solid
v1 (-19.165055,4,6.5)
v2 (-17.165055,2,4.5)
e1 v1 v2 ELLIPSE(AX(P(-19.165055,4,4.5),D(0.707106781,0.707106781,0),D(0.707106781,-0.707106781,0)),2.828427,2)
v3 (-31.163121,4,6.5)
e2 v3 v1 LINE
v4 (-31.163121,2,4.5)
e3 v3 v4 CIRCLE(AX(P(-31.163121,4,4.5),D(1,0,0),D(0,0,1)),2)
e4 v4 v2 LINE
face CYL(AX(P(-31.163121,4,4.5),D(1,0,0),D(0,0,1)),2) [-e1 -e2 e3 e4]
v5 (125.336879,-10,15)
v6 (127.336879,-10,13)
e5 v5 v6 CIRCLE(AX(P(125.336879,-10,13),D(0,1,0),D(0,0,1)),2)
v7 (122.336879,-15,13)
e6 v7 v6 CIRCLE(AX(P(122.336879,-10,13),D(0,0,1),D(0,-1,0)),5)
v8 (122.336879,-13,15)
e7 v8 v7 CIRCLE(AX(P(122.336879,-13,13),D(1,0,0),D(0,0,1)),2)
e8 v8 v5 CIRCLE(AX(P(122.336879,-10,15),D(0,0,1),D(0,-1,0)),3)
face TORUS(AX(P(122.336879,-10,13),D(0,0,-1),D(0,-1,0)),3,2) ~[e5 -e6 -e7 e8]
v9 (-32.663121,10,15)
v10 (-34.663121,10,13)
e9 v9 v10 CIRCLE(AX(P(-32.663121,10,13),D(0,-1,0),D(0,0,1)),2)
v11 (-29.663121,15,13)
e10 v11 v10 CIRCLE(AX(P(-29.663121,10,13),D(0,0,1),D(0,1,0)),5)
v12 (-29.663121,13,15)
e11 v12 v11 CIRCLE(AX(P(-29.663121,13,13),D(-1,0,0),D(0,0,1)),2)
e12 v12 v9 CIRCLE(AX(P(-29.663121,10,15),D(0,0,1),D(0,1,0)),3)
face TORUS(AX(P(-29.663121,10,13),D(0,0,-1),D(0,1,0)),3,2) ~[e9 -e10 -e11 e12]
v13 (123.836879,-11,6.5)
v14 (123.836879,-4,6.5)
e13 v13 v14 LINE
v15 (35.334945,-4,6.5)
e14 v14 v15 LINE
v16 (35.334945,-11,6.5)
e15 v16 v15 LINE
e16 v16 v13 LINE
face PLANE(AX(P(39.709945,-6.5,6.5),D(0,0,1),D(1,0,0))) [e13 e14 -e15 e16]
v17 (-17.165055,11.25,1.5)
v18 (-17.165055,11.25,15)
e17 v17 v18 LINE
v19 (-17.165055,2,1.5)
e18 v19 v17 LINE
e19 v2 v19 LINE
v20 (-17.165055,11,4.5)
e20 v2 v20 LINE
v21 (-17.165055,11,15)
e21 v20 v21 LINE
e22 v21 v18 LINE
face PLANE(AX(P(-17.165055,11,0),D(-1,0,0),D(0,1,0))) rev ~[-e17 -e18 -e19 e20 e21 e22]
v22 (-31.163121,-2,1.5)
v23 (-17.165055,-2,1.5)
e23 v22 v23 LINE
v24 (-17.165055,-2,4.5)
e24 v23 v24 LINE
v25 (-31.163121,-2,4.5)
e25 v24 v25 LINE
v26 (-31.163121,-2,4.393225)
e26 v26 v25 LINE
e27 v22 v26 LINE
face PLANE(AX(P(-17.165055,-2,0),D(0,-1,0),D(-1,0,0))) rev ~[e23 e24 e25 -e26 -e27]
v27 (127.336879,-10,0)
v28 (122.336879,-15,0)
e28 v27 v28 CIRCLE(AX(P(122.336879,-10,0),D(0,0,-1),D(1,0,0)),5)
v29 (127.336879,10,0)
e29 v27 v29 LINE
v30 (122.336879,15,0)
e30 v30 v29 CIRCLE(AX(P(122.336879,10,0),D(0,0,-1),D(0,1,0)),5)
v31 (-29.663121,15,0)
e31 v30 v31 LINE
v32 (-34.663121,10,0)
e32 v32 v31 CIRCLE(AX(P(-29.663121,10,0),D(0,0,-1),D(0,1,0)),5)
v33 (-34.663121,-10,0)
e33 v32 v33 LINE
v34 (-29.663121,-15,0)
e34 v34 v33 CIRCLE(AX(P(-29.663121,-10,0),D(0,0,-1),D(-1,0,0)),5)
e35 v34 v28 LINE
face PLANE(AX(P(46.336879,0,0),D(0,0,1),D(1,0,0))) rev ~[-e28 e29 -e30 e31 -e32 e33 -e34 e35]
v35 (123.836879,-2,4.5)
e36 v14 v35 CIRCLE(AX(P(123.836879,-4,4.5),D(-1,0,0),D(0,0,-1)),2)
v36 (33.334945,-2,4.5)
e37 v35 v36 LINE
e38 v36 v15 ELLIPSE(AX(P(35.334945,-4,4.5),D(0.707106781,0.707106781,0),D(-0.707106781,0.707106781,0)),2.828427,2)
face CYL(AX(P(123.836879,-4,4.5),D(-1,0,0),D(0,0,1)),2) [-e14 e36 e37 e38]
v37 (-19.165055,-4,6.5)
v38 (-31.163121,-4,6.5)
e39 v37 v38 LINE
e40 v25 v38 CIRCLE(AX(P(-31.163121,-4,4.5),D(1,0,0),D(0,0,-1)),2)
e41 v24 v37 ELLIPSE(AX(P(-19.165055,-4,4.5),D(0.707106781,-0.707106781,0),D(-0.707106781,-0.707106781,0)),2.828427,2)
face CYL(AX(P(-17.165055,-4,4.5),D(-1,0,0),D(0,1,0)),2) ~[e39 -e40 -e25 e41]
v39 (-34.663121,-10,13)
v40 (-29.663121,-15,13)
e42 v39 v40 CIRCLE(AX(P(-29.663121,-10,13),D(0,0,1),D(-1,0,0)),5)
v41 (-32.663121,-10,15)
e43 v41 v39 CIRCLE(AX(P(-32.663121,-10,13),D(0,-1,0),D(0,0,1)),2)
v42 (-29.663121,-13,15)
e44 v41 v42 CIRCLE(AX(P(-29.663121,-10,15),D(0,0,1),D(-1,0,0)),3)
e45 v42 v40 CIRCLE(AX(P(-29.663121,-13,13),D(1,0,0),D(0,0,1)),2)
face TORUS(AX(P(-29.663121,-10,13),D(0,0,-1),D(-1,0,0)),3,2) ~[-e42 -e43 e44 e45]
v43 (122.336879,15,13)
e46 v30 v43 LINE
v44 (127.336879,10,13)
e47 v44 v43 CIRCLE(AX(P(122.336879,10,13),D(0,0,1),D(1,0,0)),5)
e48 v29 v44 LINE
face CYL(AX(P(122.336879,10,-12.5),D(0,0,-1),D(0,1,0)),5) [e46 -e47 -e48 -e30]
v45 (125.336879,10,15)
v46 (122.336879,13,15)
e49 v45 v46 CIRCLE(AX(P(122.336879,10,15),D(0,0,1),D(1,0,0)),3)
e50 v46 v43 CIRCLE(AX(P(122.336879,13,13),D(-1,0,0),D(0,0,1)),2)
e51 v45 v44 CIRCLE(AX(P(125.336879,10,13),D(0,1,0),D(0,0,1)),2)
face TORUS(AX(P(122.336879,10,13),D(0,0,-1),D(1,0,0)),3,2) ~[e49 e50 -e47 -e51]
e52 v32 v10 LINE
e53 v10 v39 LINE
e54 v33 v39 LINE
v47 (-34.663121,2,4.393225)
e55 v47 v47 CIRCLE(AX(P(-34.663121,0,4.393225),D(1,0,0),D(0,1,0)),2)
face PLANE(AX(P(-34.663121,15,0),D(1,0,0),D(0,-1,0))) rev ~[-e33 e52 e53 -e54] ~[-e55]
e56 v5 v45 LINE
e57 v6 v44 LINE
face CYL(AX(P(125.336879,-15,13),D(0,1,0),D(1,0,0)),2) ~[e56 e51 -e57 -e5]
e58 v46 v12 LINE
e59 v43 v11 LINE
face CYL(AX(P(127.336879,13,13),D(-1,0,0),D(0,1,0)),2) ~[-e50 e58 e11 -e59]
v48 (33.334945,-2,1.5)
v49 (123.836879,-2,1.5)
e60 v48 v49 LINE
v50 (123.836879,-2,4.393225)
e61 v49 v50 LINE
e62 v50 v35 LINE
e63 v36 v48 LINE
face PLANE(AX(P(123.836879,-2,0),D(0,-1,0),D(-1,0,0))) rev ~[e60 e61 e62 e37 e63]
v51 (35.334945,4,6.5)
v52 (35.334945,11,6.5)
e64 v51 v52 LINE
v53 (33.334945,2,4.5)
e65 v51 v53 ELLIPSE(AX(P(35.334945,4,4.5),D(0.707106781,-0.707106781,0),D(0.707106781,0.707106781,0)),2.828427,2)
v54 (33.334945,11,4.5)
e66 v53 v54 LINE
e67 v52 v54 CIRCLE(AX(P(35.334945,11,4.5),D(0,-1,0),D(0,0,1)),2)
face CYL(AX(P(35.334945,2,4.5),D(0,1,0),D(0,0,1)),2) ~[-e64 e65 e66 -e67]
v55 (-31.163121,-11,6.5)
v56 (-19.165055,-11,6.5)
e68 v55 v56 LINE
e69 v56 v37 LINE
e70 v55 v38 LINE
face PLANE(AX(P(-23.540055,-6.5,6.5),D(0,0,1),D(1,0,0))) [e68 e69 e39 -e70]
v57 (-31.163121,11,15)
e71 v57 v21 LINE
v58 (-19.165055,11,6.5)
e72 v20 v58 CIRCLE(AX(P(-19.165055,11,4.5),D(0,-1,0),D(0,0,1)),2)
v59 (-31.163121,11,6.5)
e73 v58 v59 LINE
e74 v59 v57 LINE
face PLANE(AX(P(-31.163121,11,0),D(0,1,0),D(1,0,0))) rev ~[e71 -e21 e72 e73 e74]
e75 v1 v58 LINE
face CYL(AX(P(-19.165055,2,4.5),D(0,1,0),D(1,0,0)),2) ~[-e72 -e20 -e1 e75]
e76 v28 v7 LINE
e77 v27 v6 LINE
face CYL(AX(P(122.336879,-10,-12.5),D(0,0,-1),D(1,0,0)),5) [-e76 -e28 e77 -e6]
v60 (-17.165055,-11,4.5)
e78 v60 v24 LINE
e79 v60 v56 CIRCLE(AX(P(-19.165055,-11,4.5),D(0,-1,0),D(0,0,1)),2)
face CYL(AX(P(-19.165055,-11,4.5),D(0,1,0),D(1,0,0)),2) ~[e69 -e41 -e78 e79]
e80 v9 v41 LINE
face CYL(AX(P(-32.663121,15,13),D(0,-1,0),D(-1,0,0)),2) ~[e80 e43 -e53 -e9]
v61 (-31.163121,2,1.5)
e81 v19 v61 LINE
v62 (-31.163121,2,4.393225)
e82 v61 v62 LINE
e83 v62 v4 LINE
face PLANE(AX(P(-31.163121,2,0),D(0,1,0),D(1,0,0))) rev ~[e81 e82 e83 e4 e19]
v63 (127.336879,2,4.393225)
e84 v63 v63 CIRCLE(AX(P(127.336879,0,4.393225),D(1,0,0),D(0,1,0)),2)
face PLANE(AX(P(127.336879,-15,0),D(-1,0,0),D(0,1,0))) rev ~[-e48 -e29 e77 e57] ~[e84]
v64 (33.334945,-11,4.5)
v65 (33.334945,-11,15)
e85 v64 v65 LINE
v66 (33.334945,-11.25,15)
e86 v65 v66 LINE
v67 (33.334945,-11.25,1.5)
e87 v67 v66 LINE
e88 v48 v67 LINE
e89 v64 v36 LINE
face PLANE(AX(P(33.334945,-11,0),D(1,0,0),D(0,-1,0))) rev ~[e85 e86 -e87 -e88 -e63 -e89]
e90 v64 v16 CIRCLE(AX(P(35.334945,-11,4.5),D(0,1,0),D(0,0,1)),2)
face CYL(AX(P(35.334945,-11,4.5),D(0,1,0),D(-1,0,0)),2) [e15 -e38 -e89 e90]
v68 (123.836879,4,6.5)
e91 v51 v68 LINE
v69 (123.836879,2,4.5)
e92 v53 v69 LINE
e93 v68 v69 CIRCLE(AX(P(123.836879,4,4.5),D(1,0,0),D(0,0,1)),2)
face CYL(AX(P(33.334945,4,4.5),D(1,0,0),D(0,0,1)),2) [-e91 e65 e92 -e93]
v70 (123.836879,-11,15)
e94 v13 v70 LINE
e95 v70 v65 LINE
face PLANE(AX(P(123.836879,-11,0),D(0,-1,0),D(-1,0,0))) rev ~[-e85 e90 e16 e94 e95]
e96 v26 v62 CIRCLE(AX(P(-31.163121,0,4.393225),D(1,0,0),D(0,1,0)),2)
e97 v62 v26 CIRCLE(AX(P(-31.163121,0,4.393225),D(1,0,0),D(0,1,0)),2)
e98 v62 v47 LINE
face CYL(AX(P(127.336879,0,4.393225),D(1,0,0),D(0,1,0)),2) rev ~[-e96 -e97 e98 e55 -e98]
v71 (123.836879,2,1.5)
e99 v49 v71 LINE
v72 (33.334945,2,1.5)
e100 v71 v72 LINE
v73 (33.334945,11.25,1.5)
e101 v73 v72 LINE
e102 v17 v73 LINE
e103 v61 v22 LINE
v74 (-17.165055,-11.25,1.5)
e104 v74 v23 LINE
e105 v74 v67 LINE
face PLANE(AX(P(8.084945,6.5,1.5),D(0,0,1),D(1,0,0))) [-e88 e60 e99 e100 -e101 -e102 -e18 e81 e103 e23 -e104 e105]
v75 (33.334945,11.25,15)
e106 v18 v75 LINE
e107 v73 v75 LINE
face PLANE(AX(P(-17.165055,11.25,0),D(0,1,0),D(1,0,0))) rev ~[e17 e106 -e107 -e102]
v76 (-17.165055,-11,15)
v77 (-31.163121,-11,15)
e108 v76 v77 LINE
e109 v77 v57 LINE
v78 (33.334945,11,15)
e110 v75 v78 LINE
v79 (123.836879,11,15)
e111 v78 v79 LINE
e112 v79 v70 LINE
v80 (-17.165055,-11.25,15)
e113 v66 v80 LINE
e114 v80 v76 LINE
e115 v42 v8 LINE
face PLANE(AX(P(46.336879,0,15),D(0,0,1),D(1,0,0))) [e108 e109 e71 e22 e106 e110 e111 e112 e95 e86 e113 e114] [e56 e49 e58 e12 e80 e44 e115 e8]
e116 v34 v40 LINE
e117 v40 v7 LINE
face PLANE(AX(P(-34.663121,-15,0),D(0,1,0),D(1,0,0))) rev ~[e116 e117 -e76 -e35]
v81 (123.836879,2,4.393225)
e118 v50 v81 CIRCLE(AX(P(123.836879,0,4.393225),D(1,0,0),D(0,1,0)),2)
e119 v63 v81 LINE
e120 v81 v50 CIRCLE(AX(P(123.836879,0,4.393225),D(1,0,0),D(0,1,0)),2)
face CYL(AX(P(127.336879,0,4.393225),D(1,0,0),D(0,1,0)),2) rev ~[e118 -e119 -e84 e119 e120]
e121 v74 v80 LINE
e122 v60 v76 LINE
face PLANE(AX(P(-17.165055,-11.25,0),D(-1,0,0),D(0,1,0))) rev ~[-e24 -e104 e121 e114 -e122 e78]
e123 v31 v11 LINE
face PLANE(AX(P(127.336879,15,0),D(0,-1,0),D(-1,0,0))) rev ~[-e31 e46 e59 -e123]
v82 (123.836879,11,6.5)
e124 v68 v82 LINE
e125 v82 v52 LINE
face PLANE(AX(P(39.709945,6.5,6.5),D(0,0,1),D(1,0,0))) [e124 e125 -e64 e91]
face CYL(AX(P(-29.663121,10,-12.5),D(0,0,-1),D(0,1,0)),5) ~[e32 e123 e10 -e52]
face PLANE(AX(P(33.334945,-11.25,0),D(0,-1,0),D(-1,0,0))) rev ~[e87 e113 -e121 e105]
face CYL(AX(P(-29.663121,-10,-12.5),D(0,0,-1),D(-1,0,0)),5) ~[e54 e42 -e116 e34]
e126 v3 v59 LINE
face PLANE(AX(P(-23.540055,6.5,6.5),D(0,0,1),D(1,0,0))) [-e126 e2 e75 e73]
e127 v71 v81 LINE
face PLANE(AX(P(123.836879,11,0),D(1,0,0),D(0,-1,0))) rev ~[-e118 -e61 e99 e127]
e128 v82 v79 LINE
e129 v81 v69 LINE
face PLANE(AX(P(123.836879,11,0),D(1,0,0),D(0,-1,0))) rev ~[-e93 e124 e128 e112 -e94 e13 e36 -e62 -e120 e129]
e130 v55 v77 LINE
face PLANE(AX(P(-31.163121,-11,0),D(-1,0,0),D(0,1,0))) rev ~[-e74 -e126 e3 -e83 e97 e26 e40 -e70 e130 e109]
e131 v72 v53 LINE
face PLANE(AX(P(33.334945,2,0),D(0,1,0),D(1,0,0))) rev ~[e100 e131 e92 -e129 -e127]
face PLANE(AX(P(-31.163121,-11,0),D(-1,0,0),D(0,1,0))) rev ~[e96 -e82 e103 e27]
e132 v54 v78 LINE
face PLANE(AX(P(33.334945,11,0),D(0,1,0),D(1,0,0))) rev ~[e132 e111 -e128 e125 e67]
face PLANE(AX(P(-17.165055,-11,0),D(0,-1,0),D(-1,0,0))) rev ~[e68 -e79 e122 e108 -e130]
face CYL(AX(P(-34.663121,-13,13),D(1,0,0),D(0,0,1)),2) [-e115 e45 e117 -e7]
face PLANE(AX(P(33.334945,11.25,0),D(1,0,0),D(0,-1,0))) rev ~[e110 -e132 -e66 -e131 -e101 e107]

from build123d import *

# Parameters (mm, degrees)
F0_W         = 50.5
F0_H         = 9
F0_H_2       = 2
F0_W_2       = 12.75
F0_H_3       = 0.25
F0_W_3       = 1.2480659857
F1_DEPTH     = 1.5
F0_W_4       = 77.7519340143
F2_DEPTH     = 6.5
F3_DEPTH     = 15
F4_R         = 2
F5_DEPTH     = 162.001
F6_R         = 2
F7_T1_DEPTH  = 27.5
F7_T4_ANGLE  = 90
F7_T6_ANGLE  = 90
F7_T8_ANGLE  = 90
F7_T10_ANGLE = 90


# Not quite as in the source:
# - a fillet or chamfer that OpenCascade refuses, or shapes differently, is made with other operations: its cross-section is extruded or revolved along the edge and cut away or added


with BuildPart() as f1:
    # F0 (on Top) → F1 (new body)
    with BuildSketch(Plane.XY):
        with Locations((8.0849453807, 6.5)):
            Rectangle(F0_W, F0_H)
        with Locations((8.0849453807, 1)):
            Rectangle(F0_W, F0_H_2)
        with Locations((8.0849453807, -1)):
            Rectangle(F0_W, F0_H_2)
        with Locations((-23.5400546193, -1)):
            Rectangle(F0_W_2, F0_H_2)
        with Locations((-23.5400546193, 1)):
            Rectangle(F0_W_2, F0_H_2)
        with Locations((39.7099453807, 1)):
            Rectangle(F0_W_2, F0_H_2)
        with Locations((39.7099453807, -1)):
            Rectangle(F0_W_2, F0_H_2)
        Polygon((46.0849453807, 2), (46.0849453807, 0), (46.0849453807, -2), (123.8368793949, -2), (123.8368793949, 2), align=None)
        with Locations((8.0849453807, -6.5)):
            Rectangle(F0_W, F0_H)
        with Locations((8.0849453807, 11.125)):
            Rectangle(F0_W, F0_H_3)
        with Locations((8.0849453807, -11.125)):
            Rectangle(F0_W, F0_H_3)
        with Locations((-30.5390876122, -1)):
            Rectangle(F0_W_3, F0_H_2)
        with Locations((-30.5390876122, 1)):
            Rectangle(F0_W_3, F0_H_2)
    extrude(amount=F1_DEPTH)

    # F0 (on Top) → F2 (join)
    with BuildSketch(Plane.XY):
        with Locations((-23.5400546193, 6.5)):
            Rectangle(F0_W_2, F0_H)
        with Locations((-30.5390876122, 6.5)):
            Rectangle(F0_W_3, F0_H)
        with Locations((-23.5400546193, -6.5)):
            Rectangle(F0_W_2, F0_H)
        with Locations((-30.5390876122, -6.5)):
            Rectangle(F0_W_3, F0_H)
        with Locations((39.7099453807, -6.5)):
            Rectangle(F0_W_2, F0_H)
        with Locations((39.7099453807, 6.5)):
            Rectangle(F0_W_2, F0_H)
        with Locations((84.9609123878, 6.5)):
            Rectangle(F0_W_4, F0_H)
        with Locations((84.9609123878, -6.5)):
            Rectangle(F0_W_4, F0_H)
    extrude(amount=F2_DEPTH)

    # F0 (on Top) → F3 (join)
    with BuildSketch(Plane.XY):
        Polygon((127.3368793949, -15), (127.3368793949, 15), (-34.6631206051, 15), (-34.6631206051, 0), (-34.6631206051, -15), align=None)
        Polygon((-31.1631206051, -2), (-31.1631206051, 0), (-31.1631206051, 2), (-31.1631206051, 11), (-29.9150546193, 11), (-17.1650546193, 11), (-17.1650546193, 11.25), (33.3349453807, 11.25), (33.3349453807, 11), (46.0849453807, 11), (123.8368793949, 11), (123.8368793949, 2), (123.8368793949, -2), (123.8368793949, -11), (46.0849453807, -11), (33.3349453807, -11), (33.3349453807, -11.25), (-17.1650546193, -11.25), (-17.1650546193, -11), (-29.9150546193, -11), (-31.1631206051, -11), align=None, mode=Mode.SUBTRACT)
    extrude(amount=F3_DEPTH)

    # F4 (on face) → F5 (cut, through all)
    with BuildSketch(Plane.YZ.offset(127.3368793949)):
        with Locations((0, 4.3932246044)):
            Circle(F4_R)
    extrude(amount=-F5_DEPTH, mode=Mode.SUBTRACT)

    # F6
    f6_edges = [f1.edges().sort_by_distance(p)[0] for p in [
        (-24.164088, -2, 6.5),
        (-24.164088, 2, 6.5),
        (-17.165055, -6.5, 6.5),
        (-17.165055, 6.5, 6.5),
        (33.334945, 6.5, 6.5),
        (33.334945, -6.5, 6.5),
        (78.585912, -2, 6.5),
        (78.585912, 2, 6.5),
        (46.336879, 15, 15),
        (-34.663121, 0, 15),
        (46.336879, -15, 15),
        (127.336879, 0, 15),
    ]]
    fillet(f6_edges, radius=F6_R)

    # F7: fillet of radius 5 on 4 edges, made by hand

    # F7_s2 → F7_t1 (cut)
    with BuildSketch(Plane.XY.offset(-12.5)):
        with BuildLine():
            ThreePointArc((-29.6631206051, 15), (-33.198654511, 13.5355339059), (-34.6631206051, 10))
            Line((-34.6631206051, 10), (-34.6631206051, 15))
            Line((-34.6631206051, 15), (-29.6631206051, 15))
        make_face()
        with BuildLine():
            ThreePointArc((-34.6631206051, -10), (-33.198654511, -13.5355339059), (-29.6631206051, -15))
            Line((-29.6631206051, -15), (-34.6631206051, -15))
            Line((-34.6631206051, -15), (-34.6631206051, -10))
        make_face()
        with BuildLine():
            ThreePointArc((122.3368793949, 15), (125.8724133009, 13.5355339059), (127.3368793949, 10))
            Line((127.3368793949, 10), (127.3368793949, 15))
            Line((127.3368793949, 15), (122.3368793949, 15))
        make_face()
        with BuildLine():
            ThreePointArc((127.3368793949, -10), (125.8724133009, -13.5355339059), (122.3368793949, -15))
            Line((122.3368793949, -15), (127.3368793949, -15))
            Line((127.3368793949, -15), (127.3368793949, -10))
        make_face()
    extrude(amount=F7_T1_DEPTH, mode=Mode.SUBTRACT)

    # F7_s3 → F7_t4 (revolve, cut)
    with BuildSketch(Plane.YZ.offset(122.3368793949)):
        with BuildLine():
            ThreePointArc((-13, 15), (-14.4142135624, 14.4142135624), (-15, 13))
            Line((-15, 13), (-15, 15))
            Line((-15, 15), (-13, 15))
        make_face()
    revolve(axis=Axis((122.3368793949, -10, 15), (0, 0, 1)), revolution_arc=F7_T4_ANGLE, mode=Mode.SUBTRACT)

    # F7_s5 → F7_t6 (revolve, cut)
    with BuildSketch(Plane.XZ.offset(-10)):
        with BuildLine():
            ThreePointArc((125.3368793949, 15), (126.7510929573, 14.4142135624), (127.3368793949, 13))
            Line((127.3368793949, 13), (127.3368793949, 15))
            Line((127.3368793949, 15), (125.3368793949, 15))
        make_face()
    revolve(axis=Axis((122.3368793949, 10, 15), (0, 0, 1)), revolution_arc=F7_T6_ANGLE, mode=Mode.SUBTRACT)

    # F7_s7 → F7_t8 (revolve, cut)
    with BuildSketch(Plane.XZ.offset(10)):
        with BuildLine():
            ThreePointArc((-32.6631206051, 15), (-34.0773341674, 14.4142135624), (-34.6631206051, 13))
            Line((-34.6631206051, 13), (-34.6631206051, 15))
            Line((-34.6631206051, 15), (-32.6631206051, 15))
        make_face()
    revolve(axis=Axis((-29.6631206051, -10, 15), (0, 0, 1)), revolution_arc=F7_T8_ANGLE, mode=Mode.SUBTRACT)

    # F7_s9 → F7_t10 (revolve, cut)
    with BuildSketch(Plane.YZ.offset(-29.6631206051)):
        with BuildLine():
            ThreePointArc((13, 15), (14.4142135624, 14.4142135624), (15, 13))
            Line((15, 13), (15, 15))
            Line((15, 15), (13, 15))
        make_face()
    revolve(axis=Axis((-29.6631206051, 10, 15), (0, 0, 1)), revolution_arc=F7_T10_ANGLE, mode=Mode.SUBTRACT)


solid = f1.part
